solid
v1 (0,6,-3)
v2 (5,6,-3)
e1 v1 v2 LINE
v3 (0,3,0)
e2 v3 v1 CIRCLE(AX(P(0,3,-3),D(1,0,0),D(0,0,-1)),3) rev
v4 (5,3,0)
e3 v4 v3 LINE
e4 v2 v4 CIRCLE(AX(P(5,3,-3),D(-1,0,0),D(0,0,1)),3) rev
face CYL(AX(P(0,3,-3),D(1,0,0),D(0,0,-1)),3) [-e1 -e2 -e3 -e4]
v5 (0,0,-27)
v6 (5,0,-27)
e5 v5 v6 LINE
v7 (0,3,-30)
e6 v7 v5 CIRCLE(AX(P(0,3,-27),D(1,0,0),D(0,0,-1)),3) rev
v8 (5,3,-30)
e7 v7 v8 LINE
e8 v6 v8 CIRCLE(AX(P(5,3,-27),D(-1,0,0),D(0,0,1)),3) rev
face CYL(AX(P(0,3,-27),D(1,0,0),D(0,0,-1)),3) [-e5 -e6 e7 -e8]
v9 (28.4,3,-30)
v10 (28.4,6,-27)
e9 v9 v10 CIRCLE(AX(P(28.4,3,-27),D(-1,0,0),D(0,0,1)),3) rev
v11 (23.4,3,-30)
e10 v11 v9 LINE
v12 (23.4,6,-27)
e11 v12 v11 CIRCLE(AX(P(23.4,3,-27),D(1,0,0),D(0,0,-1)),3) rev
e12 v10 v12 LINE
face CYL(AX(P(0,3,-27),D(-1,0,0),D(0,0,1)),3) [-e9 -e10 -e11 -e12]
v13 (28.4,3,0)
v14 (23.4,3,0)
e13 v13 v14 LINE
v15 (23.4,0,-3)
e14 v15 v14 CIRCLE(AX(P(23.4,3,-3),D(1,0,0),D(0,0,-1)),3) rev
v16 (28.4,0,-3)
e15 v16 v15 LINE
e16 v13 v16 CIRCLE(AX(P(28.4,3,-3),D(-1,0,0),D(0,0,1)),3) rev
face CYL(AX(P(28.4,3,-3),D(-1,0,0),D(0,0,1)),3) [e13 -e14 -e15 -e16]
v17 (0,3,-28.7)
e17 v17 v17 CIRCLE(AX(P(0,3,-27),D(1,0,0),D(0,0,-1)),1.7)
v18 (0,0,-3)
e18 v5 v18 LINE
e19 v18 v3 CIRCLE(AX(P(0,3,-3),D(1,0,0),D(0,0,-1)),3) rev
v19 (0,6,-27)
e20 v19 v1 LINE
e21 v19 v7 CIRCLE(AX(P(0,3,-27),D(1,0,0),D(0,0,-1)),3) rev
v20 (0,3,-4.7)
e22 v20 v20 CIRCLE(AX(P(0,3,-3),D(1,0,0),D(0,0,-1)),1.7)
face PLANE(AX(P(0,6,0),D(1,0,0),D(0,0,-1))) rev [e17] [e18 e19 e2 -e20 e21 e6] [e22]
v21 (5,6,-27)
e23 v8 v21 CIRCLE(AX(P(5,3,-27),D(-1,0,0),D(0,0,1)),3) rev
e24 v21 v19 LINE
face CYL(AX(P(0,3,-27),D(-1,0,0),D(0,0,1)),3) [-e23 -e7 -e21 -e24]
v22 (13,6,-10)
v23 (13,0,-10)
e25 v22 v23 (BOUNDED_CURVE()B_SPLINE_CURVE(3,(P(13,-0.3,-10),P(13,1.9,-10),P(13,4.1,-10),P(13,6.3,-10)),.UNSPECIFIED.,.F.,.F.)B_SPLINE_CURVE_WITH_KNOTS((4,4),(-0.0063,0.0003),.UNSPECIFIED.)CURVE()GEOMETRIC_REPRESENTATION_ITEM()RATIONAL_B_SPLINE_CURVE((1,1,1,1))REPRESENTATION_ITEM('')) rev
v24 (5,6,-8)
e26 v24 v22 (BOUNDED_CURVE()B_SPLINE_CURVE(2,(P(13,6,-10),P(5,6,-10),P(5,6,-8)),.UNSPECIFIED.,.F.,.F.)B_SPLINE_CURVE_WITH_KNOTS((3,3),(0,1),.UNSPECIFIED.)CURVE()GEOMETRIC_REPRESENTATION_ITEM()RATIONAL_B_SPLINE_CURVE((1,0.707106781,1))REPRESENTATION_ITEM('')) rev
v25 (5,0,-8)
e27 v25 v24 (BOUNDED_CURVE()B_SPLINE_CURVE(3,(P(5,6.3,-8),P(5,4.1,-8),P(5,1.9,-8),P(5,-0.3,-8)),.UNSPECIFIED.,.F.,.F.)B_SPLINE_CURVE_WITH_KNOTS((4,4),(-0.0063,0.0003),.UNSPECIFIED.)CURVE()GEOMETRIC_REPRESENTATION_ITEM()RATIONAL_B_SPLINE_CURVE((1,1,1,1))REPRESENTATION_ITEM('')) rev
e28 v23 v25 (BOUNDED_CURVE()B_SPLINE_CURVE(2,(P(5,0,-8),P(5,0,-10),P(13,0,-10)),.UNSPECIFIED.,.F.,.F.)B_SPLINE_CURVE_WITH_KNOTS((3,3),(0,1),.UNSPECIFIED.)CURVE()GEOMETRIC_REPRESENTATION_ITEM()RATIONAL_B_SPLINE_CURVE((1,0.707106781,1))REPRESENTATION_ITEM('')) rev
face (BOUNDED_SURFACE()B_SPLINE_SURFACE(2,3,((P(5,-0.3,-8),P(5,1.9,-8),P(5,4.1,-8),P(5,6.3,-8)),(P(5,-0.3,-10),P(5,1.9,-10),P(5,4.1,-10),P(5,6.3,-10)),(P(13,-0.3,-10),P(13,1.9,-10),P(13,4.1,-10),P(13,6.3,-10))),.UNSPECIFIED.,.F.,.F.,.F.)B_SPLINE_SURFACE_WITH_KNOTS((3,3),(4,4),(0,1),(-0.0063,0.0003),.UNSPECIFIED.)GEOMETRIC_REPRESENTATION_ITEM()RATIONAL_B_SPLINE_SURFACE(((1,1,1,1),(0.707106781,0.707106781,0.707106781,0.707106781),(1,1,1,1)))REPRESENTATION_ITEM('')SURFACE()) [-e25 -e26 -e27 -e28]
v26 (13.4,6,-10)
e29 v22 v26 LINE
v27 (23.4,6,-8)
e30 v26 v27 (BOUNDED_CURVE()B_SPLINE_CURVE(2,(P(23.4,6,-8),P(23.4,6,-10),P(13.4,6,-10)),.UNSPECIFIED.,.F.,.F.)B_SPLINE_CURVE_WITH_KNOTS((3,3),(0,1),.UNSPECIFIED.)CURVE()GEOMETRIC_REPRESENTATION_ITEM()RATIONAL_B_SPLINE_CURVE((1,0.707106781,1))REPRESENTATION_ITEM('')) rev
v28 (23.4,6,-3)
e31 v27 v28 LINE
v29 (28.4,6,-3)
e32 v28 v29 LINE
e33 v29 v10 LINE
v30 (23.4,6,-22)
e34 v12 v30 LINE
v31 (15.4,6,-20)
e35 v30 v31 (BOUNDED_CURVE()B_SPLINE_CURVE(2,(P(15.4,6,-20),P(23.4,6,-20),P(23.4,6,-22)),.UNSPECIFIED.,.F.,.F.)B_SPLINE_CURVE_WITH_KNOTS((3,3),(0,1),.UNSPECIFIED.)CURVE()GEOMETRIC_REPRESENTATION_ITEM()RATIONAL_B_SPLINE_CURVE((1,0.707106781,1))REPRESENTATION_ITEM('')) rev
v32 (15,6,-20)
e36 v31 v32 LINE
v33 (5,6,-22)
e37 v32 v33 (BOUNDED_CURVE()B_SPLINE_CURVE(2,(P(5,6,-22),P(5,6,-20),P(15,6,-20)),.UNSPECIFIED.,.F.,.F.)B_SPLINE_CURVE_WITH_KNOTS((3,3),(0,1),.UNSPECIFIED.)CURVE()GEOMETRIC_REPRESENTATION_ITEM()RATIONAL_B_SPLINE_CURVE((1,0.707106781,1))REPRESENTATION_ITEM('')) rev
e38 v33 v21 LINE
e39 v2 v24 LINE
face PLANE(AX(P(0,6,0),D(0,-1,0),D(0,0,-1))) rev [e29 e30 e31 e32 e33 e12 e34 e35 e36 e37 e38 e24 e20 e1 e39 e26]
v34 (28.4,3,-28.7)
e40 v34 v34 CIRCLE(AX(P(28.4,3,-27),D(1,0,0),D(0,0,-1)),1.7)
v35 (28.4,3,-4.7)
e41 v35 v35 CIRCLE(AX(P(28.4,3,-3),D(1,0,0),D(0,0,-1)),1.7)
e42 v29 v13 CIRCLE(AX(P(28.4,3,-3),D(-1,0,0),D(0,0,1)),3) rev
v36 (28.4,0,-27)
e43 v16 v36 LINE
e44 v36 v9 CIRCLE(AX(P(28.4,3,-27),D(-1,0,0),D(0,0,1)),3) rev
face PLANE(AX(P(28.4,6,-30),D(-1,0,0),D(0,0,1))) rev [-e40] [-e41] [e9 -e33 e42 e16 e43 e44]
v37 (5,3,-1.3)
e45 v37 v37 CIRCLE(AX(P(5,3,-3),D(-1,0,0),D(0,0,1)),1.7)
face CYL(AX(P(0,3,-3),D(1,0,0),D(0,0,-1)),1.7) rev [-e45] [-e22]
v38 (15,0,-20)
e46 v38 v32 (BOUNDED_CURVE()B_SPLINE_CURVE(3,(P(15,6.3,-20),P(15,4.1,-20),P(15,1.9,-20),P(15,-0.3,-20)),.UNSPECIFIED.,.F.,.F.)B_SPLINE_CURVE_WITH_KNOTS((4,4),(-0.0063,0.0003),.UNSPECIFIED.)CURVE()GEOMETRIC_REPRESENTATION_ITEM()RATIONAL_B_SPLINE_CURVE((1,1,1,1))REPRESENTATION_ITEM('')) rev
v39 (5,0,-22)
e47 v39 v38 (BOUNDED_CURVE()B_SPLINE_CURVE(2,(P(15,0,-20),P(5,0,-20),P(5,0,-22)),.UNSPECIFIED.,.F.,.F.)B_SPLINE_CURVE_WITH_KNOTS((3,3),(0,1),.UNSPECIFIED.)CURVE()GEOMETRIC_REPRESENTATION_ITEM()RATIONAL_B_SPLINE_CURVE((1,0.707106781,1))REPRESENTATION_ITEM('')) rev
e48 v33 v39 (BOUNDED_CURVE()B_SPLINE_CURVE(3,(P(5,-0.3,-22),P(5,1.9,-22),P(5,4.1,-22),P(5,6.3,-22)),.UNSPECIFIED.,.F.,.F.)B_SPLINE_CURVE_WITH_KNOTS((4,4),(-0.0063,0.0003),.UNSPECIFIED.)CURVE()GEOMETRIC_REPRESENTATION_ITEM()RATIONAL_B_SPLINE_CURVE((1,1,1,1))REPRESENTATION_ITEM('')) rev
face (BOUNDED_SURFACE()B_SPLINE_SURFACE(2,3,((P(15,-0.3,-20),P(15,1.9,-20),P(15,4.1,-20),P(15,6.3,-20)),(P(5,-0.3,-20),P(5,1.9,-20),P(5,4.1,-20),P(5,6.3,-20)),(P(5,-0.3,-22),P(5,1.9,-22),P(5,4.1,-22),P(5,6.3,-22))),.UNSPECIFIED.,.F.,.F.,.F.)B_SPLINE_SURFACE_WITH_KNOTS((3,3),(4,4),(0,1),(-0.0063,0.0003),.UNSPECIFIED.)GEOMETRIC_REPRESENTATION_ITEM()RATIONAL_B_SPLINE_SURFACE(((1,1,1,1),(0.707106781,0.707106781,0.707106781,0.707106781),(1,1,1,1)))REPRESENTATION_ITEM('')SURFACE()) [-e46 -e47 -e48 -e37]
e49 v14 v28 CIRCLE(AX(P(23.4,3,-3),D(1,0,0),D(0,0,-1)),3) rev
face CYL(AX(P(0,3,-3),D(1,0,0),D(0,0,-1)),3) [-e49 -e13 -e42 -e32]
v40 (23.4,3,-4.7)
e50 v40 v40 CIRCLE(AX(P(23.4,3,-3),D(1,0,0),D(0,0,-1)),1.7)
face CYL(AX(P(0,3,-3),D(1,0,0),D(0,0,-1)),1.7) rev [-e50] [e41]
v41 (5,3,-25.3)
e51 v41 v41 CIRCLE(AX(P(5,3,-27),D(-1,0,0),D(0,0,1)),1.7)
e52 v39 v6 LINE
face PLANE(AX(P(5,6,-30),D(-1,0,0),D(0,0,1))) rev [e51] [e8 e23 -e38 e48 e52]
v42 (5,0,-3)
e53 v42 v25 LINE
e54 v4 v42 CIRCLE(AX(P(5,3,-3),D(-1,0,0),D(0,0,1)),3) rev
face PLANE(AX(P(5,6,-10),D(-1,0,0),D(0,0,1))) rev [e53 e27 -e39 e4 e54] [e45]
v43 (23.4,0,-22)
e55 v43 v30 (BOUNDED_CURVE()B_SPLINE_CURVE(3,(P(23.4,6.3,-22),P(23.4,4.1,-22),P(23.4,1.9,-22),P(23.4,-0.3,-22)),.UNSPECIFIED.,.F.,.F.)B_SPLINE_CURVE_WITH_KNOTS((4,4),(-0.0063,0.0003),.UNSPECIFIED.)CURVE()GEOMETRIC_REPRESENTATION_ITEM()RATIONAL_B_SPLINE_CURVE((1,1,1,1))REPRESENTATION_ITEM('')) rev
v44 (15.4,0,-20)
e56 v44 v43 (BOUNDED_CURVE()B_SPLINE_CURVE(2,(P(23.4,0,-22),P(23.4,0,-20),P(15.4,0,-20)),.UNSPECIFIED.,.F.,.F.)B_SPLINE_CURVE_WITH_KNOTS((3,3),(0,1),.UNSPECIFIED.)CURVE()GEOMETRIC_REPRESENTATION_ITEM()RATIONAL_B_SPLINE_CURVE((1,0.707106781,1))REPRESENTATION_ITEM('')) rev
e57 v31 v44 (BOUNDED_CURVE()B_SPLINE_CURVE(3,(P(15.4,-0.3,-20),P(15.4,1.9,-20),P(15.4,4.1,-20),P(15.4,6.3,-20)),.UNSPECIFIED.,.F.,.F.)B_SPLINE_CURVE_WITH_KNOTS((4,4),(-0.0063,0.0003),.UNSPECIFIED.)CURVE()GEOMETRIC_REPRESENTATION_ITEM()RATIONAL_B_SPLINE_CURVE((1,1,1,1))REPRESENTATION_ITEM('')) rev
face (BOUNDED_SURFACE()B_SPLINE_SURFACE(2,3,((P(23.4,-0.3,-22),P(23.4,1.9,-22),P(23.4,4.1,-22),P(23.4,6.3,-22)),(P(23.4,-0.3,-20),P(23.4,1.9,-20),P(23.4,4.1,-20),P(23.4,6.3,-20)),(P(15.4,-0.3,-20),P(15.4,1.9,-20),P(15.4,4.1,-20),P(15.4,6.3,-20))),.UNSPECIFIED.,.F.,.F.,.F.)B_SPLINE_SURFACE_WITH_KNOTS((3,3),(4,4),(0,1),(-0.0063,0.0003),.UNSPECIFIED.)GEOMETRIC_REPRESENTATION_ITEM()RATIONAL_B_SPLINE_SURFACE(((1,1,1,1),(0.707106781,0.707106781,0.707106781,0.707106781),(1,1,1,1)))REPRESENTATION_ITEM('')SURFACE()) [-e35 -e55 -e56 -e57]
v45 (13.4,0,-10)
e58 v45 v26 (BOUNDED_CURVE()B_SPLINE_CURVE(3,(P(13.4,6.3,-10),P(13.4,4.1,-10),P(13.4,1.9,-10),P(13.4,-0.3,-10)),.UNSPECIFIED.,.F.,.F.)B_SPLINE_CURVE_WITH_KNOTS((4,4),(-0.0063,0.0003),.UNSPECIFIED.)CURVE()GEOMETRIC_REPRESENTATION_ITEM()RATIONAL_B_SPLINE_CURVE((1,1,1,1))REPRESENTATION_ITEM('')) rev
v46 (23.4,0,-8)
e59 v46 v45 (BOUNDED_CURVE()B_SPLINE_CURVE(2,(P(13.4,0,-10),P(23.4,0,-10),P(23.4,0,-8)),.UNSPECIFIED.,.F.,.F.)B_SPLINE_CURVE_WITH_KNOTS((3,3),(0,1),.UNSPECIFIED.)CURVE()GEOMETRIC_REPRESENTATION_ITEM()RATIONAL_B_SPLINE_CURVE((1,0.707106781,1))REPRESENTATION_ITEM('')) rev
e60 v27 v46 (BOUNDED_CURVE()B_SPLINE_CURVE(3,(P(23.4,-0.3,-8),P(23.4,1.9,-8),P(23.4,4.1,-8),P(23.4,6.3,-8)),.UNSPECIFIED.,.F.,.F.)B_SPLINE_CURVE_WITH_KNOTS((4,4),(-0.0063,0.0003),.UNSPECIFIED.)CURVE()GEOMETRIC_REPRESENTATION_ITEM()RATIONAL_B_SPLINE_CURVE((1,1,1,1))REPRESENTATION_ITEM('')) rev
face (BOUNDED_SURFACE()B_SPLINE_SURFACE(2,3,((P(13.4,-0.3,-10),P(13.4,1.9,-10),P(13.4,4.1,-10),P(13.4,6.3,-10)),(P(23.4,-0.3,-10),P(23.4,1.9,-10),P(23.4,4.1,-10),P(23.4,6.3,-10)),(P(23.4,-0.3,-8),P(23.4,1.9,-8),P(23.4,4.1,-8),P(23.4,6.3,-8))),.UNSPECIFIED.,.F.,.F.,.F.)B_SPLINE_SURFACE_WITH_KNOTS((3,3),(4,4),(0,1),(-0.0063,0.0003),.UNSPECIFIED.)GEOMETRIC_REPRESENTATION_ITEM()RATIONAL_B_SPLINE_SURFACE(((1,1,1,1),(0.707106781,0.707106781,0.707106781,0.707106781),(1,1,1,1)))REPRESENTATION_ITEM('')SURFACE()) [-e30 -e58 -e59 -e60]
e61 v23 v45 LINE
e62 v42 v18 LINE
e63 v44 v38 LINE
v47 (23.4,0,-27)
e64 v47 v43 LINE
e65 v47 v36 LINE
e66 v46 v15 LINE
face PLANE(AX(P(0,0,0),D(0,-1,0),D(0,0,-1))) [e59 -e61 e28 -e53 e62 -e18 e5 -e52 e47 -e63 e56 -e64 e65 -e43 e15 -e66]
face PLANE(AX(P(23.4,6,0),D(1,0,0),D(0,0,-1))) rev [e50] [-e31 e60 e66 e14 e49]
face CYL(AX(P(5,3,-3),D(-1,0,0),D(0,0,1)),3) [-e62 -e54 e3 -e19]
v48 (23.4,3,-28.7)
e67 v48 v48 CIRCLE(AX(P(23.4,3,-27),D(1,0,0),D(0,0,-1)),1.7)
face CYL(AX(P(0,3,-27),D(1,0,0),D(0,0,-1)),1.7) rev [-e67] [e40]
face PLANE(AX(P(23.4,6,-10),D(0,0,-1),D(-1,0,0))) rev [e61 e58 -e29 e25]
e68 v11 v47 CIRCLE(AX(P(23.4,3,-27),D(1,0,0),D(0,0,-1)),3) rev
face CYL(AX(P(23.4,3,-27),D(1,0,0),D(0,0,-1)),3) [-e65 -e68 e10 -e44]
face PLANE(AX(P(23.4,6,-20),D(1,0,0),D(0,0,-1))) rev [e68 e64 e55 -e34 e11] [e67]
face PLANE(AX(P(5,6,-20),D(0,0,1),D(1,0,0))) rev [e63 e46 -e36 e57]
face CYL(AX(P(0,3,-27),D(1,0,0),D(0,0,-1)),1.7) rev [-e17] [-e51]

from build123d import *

# Parameters (mm, degrees)
BOSS_EXTRUDE1_DEPTH = 6
FILLET1_R           = 3
SKETCH2_R           = 1.7
CUT_EXTRUDE1_DEPTH  = 42.743981602
FILLET2_SIZE        = 8
FILLET2_SIZE_2      = 2
FILLET3_SIZE        = 2
FILLET3_SIZE_2      = 10


# Some blends are built 0.0001 mm under size
with BuildPart() as part:
    # Sketch1 → Boss-Extrude1 (new body)
    with BuildSketch(Plane(origin=(0, 0, 0), x_dir=(1, 0, 0), z_dir=(0, 1, 0))):
        Polygon((0, 0), (0, 30), (5, 30), (5, 20), (23.4, 20), (23.4, 30), (28.4, 30), (28.4, 0), (23.4, 0), (23.4, 10), (5, 10), (5, 0), align=None)
    extrude(amount=BOSS_EXTRUDE1_DEPTH)

    # Fillet1
    fillet1_edges = [part.edges().sort_by_distance(p)[0] for p in [
        (2.5, 0, -30),
        (2.5, 6, -30),
        (25.9, 0, -30),
        (25.9, 6, -30),
        (2.5, 0, 0),
        (2.5, 6, 0),
        (25.9, 0, 0),
        (25.9, 6, 0),
    ]]
    fillet(fillet1_edges, radius=FILLET1_R - 0.0001)  # a hair under: the kernel refuses the full size

    # Sketch2 → Cut-Extrude1 (cut, through all)
    with BuildSketch(Plane(origin=(28.4, 0, 0), x_dir=(0, 0, -1), z_dir=(1, 0, 0))):
        with Locations((3, 3)):
            Circle(SKETCH2_R)
        with Locations((27, 3)):
            Circle(SKETCH2_R)
    extrude(amount=-CUT_EXTRUDE1_DEPTH, mode=Mode.SUBTRACT)

    # Fillet2
    # an asymmetric fillet: 8, 2 mm, written as the material it adds along each edge
    with BuildSketch(Plane(origin=(23.4, 0, -20), x_dir=(-1, 0, 0), z_dir=(0, 1, 0))) as fillet2_piece_1:
        with BuildLine():
            Bezier((FILLET2_SIZE, 0), (0, 0), (0, -FILLET2_SIZE_2), weights=[1, 0.707106781, 1])
            Line((0, -FILLET2_SIZE_2), (0, 0))
            Line((0, 0), (FILLET2_SIZE, 0))
        make_face()
    extrude(amount=6)
    with BuildSketch(Plane(origin=(5, 0, -10), x_dir=(0, 0, 1), z_dir=(0, 1, 0))) as fillet2_piece_2:
        with BuildLine():
            Bezier((FILLET2_SIZE_2, 0), (0, 0), (0, FILLET2_SIZE), weights=[1, 0.707106781, 1])
            Line((0, FILLET2_SIZE), (0, 0))
            Line((0, 0), (FILLET2_SIZE_2, 0))
        make_face()
    extrude(amount=6)

    # Fillet3
    # an asymmetric fillet: 10, 2 mm, written as the material it adds along each edge
    with BuildSketch(Plane(origin=(5, 0, -20), x_dir=(0, 0, -1), z_dir=(0, 1, 0))) as fillet3_piece_1:
        with BuildLine():
            Bezier((FILLET3_SIZE, 0), (0, 0), (0, -FILLET3_SIZE_2), weights=[1, 0.707106781, 1])
            Line((0, -FILLET3_SIZE_2), (0, 0))
            Line((0, 0), (FILLET3_SIZE, 0))
        make_face()
    extrude(amount=6)
    with BuildSketch(Plane(origin=(23.4, 0, -10), x_dir=(-1, 0, 0), z_dir=(0, 1, 0))) as fillet3_piece_2:
        with BuildLine():
            Bezier((FILLET3_SIZE_2, 0), (0, 0), (0, FILLET3_SIZE), weights=[1, 0.707106781, 1])
            Line((0, FILLET3_SIZE), (0, 0))
            Line((0, 0), (FILLET3_SIZE_2, 0))
        make_face()
    extrude(amount=6)


solid = part.part
